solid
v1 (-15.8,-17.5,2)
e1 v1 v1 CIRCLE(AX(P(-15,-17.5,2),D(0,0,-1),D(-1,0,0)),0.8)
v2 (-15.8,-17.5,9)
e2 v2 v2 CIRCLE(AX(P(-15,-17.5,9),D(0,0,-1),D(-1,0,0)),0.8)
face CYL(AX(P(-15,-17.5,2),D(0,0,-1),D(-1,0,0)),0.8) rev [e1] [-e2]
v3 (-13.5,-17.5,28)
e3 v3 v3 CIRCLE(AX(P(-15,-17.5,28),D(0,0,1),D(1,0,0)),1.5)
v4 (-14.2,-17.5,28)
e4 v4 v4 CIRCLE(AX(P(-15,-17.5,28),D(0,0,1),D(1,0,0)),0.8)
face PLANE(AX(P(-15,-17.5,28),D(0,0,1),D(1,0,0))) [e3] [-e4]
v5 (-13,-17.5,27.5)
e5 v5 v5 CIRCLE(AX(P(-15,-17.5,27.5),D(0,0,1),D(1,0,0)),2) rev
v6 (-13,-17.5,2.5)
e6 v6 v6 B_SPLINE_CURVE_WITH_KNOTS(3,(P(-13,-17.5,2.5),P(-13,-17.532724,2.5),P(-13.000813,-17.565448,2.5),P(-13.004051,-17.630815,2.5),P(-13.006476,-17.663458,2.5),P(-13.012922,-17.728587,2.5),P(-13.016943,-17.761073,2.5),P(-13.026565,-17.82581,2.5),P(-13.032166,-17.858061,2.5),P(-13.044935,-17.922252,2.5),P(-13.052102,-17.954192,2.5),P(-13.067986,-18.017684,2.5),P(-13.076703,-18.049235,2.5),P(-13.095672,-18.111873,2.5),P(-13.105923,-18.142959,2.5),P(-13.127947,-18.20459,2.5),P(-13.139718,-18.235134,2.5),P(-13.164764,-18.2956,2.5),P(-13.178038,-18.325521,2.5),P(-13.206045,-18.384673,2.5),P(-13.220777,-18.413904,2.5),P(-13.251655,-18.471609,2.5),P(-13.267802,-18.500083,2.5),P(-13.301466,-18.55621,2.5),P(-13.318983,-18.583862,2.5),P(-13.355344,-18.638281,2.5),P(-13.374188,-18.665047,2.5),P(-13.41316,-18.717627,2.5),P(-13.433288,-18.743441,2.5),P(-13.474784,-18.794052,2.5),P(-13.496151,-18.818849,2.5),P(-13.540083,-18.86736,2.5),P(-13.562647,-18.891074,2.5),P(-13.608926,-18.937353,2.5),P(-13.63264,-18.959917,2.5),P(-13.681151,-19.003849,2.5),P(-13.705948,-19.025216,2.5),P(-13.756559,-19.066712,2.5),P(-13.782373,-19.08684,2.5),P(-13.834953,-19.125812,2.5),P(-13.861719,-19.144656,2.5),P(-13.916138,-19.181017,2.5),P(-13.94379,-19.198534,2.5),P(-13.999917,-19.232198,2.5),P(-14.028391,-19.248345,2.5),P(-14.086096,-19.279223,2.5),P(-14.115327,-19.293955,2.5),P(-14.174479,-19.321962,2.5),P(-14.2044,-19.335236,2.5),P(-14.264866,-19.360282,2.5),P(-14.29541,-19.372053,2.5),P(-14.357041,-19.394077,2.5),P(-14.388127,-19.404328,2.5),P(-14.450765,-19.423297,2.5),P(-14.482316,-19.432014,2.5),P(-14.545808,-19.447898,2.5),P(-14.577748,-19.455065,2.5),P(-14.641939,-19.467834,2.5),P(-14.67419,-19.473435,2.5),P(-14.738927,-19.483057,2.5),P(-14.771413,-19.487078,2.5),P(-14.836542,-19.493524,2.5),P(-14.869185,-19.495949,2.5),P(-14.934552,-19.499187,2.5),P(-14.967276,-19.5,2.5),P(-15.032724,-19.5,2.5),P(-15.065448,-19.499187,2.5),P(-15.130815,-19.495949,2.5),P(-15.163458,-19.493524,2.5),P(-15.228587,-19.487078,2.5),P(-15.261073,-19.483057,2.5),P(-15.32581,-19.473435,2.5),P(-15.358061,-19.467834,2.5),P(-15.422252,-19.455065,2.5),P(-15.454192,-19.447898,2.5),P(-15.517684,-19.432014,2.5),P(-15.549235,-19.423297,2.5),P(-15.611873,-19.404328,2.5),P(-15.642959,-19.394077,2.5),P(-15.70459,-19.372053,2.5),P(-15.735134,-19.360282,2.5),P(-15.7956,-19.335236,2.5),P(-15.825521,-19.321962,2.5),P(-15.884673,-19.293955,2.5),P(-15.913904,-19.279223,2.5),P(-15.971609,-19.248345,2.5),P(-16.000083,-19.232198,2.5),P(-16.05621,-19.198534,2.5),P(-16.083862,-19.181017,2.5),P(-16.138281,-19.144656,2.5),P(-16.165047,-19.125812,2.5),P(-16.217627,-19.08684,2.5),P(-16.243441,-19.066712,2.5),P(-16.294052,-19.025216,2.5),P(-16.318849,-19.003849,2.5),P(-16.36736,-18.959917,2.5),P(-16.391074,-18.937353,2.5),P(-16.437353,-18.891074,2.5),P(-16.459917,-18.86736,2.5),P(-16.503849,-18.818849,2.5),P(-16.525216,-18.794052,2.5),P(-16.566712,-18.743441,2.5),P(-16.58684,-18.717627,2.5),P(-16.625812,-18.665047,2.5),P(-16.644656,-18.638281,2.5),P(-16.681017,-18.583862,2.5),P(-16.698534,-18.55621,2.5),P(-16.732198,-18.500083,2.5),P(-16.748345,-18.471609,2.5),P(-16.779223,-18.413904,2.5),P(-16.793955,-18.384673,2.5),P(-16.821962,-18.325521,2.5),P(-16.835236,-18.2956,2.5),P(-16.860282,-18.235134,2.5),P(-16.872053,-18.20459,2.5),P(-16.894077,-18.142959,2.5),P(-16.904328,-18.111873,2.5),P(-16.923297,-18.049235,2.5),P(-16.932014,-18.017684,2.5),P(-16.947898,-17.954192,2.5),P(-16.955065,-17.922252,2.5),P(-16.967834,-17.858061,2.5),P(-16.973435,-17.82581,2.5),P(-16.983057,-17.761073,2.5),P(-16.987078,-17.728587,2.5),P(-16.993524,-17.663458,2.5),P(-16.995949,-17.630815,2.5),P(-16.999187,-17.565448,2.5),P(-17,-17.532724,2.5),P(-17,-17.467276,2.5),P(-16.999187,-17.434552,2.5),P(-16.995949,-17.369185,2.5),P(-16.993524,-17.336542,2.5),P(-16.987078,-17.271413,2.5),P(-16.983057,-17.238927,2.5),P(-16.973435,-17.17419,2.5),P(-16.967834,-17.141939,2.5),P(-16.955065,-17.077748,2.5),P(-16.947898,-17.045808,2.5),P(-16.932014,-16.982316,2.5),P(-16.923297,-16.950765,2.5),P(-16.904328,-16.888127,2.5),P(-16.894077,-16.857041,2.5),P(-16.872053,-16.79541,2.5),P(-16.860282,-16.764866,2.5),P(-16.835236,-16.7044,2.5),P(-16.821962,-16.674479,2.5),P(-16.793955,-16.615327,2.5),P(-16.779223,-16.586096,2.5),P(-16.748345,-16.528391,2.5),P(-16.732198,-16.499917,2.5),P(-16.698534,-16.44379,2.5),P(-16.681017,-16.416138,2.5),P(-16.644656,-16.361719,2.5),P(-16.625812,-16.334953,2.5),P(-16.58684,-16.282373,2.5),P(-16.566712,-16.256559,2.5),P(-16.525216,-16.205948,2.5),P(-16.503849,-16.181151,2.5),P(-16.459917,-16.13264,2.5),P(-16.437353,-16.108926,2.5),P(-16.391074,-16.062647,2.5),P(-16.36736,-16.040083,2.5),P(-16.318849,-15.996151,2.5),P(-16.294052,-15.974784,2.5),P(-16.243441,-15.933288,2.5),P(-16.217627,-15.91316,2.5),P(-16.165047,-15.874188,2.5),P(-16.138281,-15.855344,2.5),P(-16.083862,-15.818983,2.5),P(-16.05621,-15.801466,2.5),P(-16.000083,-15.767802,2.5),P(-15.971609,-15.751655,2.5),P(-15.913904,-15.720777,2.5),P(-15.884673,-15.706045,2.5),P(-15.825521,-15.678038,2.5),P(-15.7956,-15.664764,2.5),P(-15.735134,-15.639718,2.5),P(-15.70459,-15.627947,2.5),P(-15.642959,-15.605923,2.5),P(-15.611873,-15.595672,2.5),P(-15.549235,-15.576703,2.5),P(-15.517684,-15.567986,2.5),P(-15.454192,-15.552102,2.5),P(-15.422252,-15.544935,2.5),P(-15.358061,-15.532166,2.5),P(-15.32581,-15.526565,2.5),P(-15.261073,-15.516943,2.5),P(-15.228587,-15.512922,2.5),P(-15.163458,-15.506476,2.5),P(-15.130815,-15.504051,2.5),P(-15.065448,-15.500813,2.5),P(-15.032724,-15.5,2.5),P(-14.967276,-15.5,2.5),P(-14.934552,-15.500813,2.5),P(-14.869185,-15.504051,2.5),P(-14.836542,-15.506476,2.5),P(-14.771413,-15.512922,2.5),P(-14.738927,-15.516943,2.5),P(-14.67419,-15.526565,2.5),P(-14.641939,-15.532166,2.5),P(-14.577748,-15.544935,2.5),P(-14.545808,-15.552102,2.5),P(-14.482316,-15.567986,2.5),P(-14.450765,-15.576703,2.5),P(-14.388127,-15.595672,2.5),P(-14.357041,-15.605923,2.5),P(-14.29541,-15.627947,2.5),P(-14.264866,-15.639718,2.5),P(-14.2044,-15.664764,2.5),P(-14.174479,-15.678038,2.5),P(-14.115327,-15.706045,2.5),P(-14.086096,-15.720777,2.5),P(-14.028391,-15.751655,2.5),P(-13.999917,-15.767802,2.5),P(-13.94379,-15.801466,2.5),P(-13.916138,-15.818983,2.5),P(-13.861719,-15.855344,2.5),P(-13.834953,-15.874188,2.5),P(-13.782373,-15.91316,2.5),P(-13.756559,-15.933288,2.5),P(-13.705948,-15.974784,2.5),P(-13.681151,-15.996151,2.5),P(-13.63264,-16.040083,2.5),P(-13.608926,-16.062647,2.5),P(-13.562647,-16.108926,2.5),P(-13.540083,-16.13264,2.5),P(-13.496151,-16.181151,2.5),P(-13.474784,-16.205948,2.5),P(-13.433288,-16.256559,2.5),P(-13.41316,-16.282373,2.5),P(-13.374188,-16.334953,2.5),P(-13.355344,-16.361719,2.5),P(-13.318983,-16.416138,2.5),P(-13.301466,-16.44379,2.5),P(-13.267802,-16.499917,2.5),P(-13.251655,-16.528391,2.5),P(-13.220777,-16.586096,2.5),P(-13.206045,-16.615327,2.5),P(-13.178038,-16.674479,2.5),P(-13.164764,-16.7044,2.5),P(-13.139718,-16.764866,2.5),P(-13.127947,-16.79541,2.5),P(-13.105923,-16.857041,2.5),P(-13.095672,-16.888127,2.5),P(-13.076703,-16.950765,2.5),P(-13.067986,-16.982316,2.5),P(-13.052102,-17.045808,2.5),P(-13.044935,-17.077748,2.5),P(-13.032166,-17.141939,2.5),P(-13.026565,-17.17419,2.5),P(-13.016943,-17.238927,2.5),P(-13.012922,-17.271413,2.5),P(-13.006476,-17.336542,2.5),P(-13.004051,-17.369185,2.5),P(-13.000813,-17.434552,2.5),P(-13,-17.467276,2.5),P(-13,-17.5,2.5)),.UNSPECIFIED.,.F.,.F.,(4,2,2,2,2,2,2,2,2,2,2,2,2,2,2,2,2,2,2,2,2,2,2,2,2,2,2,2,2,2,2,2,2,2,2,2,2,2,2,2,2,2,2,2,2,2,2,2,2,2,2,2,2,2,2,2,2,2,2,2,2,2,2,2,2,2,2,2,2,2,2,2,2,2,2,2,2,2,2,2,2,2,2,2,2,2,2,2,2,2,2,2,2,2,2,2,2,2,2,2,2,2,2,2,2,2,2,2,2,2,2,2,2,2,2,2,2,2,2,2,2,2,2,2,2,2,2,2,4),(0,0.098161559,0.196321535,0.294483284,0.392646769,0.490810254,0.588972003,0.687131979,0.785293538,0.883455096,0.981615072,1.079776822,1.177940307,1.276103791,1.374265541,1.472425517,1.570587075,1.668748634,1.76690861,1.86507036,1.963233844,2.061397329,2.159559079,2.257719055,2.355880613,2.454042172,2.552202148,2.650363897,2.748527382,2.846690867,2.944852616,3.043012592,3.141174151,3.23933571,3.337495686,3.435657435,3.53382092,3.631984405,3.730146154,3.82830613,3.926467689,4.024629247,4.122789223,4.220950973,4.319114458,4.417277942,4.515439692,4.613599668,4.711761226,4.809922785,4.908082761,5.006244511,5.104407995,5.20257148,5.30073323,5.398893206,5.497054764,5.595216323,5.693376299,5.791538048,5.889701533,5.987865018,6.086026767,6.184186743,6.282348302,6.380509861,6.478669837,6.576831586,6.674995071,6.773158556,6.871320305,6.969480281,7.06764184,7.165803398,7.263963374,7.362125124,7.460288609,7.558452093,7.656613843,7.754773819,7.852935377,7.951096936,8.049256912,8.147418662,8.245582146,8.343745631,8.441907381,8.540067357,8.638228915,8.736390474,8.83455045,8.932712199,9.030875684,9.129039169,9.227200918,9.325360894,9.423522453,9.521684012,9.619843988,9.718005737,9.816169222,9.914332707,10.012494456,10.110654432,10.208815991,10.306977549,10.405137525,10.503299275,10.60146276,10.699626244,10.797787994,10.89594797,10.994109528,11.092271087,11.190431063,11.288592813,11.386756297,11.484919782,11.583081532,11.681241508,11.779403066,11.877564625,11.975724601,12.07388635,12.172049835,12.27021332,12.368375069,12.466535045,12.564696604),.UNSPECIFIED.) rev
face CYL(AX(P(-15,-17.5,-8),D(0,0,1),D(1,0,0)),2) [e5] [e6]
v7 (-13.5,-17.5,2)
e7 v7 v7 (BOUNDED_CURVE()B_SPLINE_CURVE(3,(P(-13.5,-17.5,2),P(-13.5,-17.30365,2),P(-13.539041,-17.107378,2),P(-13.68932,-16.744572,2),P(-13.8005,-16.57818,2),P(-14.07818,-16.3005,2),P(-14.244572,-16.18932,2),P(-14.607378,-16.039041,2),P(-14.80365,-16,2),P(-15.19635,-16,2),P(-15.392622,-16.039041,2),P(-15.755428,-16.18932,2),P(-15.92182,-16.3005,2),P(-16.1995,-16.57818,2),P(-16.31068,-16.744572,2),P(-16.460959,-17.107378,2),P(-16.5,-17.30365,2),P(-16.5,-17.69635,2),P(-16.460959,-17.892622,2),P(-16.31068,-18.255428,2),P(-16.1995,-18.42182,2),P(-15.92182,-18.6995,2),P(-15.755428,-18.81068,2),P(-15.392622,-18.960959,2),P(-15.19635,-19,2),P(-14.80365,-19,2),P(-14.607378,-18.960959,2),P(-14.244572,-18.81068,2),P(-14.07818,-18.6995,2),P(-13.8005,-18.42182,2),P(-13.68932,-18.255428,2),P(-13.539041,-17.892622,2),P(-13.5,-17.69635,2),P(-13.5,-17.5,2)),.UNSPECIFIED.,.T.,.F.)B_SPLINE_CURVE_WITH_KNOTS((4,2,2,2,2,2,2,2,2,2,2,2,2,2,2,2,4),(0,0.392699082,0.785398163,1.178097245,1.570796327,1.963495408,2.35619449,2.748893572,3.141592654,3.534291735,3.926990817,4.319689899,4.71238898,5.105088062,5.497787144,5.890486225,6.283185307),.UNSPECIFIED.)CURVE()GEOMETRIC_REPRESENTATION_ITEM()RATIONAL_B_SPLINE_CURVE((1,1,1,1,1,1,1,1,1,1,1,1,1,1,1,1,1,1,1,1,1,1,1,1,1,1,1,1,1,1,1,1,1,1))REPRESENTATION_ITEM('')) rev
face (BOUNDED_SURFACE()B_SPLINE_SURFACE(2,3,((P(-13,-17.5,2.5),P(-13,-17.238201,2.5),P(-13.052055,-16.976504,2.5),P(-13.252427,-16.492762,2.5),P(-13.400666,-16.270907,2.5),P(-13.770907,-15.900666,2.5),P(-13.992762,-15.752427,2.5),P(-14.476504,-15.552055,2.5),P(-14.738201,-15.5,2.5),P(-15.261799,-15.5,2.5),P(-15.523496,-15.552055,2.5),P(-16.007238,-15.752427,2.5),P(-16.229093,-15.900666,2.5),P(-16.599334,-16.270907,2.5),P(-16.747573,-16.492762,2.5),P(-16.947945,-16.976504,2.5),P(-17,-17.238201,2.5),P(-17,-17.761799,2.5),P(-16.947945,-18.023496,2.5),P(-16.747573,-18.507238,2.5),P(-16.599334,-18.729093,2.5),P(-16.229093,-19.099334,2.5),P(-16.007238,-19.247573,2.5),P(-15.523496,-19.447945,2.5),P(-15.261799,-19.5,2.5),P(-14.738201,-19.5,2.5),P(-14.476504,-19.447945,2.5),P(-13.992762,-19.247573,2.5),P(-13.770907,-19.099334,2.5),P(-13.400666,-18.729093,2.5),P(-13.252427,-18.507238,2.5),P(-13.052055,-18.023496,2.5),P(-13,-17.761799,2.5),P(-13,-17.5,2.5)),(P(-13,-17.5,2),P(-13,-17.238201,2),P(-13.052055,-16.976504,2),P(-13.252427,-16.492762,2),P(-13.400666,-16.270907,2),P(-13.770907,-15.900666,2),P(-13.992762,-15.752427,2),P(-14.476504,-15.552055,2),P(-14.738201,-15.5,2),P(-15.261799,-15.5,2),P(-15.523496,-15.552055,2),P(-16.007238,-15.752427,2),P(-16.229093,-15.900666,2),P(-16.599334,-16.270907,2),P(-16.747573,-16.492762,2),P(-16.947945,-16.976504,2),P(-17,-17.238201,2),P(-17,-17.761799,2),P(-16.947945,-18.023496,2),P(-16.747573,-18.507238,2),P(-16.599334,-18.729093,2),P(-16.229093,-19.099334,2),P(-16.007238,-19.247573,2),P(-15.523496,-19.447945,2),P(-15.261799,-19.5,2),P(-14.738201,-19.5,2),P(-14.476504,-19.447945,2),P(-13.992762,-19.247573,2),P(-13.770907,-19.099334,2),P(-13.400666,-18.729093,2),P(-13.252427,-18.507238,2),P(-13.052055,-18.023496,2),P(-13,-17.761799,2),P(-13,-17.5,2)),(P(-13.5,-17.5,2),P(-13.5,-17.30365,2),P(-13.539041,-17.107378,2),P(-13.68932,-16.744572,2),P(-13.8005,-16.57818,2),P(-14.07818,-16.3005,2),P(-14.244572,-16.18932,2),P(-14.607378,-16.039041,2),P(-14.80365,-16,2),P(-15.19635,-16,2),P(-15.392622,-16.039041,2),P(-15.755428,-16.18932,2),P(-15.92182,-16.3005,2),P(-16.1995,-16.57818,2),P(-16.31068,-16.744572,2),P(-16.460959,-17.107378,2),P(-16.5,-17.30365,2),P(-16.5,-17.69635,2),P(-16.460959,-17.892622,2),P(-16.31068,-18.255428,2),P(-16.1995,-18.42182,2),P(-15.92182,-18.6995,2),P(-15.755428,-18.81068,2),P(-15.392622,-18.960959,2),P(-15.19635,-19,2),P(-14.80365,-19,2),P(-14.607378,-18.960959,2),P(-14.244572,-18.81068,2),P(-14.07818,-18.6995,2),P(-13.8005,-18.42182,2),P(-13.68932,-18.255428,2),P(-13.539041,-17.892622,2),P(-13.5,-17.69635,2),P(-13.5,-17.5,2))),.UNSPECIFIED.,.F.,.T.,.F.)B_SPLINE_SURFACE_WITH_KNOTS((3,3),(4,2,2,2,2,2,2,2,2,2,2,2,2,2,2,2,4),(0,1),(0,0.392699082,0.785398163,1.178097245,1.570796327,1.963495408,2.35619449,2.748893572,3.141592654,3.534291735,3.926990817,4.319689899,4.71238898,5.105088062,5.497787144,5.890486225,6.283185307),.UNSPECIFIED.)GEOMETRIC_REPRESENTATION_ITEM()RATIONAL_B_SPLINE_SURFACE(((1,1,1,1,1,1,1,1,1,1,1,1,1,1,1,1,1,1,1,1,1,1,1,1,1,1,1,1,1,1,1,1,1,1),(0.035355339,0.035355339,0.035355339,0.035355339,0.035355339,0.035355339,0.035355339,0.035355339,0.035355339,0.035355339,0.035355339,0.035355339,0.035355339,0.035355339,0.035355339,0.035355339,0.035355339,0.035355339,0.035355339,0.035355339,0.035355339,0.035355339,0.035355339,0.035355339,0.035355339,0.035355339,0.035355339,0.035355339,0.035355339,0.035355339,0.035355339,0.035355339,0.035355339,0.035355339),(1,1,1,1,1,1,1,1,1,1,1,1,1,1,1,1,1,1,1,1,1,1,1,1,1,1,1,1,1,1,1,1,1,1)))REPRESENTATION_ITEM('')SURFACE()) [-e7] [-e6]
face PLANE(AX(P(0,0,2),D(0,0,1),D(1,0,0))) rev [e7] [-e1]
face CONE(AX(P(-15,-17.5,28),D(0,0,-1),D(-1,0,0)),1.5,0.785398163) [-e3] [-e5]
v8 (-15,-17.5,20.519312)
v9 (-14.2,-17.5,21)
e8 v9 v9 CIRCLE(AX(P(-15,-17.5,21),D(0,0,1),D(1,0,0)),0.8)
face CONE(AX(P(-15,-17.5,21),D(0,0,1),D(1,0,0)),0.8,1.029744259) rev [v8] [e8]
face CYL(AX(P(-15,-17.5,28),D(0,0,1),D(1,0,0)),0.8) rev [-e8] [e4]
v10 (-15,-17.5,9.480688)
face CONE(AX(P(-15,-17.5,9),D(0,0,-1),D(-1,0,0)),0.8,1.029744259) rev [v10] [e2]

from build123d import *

# Parameters (mm, degrees)
SKETCH_2_W             = 38
SKETCH_2_H             = 39
EXTRUDE_1_DEPTH        = 2
CHAMFER_3_SIZE         = 1
SKETCH_7_R             = 4.25
CUT_EXTRUDE_3_DEPTH    = 10
SKETCH_8_W             = 2
SKETCH_8_H             = 39
CUT_EXTRUDE_4_DEPTH    = 10
FILLET_3_R             = 2
SKETCH_9_R             = 2
EXTRUDE_1_2_DEPTH      = 26
SKETCH_10_W            = 3
SKETCH_10_H            = 39
CUT_EXTRUDE_1_DEPTH    = 10
FILLET_5_R             = 2
CHAMFER_5_SIZE         = 0.5
HOLE_WIZARD_M2_5_3_D   = 2.05
HOLE_WIZARD_M2_1_D     = 1.6
HOLE_WIZARD_M2_1_DEPTH = 7
HOLE_WIZARD_M2_1_TIP   = 0.480688495
CUT_EXTRUDE_2_DEPTH    = 10
SKETCH_24_W            = 71.290640242
SKETCH_24_H            = 51.144653494
CUT_EXTRUDE_3_2_DEPTH  = 10
SKETCH_25_R            = 6.539265834
CUT_EXTRUDE_4_2_DEPTH  = 32
HOLE_WIZARD_M2_2_D     = 1.6
HOLE_WIZARD_M2_2_DEPTH = 7
HOLE_WIZARD_M2_2_TIP   = 0.480688495
FILLET_6_SIZE          = 0.5


with BuildPart() as part:
    # 草图2 → Extrude 1 (new body)
    with BuildSketch(Plane.XY):
        Rectangle(SKETCH_2_W, SKETCH_2_H)
    extrude(amount=EXTRUDE_1_DEPTH)

    # 倒角3
    chamfer_3_edges = [part.edges().sort_by_distance(p)[0] for p in [
        (-19, 19.5, 1),
        (-19, -19.5, 1),
    ]]
    chamfer(chamfer_3_edges, length=CHAMFER_3_SIZE)

    # 草图7 → Cut-Extrude 3 (cut)
    with BuildSketch(Plane.XY.offset(2)):
        with Locations((2, 0)):
            Circle(SKETCH_7_R)
    extrude(amount=-CUT_EXTRUDE_3_DEPTH, mode=Mode.SUBTRACT)

    # 草图8 → Cut-Extrude 4 (cut)
    with BuildSketch(Plane.XY.offset(2)):
        with Locations((-18, 0)):
            Rectangle(SKETCH_8_W, SKETCH_8_H)
    extrude(amount=-CUT_EXTRUDE_4_DEPTH, mode=Mode.SUBTRACT)

    # 圆角3
    fillet_3_edges = [part.edges().sort_by_distance(p)[0] for p in [
        (-17, 19.5, 1),
        (-17, -19.5, 1),
    ]]
    fillet(fillet_3_edges, radius=FILLET_3_R)

    # 草图9 → Extrude 1 2 (add)
    with BuildSketch(Plane.XY.offset(2)):
        with Locations((-15, 17.5)):
            Circle(SKETCH_9_R)
        with Locations((-15, -17.5)):
            Circle(SKETCH_9_R)
    extrude_1_2 = extrude(amount=EXTRUDE_1_2_DEPTH)

    # 镜向1: Extrude 1 2 across plane
    add(extrude_1_2.mirror(Plane.ZX))

    # 草图10 → 切除-拉伸1 (cut)
    with BuildSketch(Plane(origin=(0, 0, 0), x_dir=(-1, 0, 0), z_dir=(0, 0, -1))):
        with Locations((-17.5, 0)):
            Rectangle(SKETCH_10_W, SKETCH_10_H)
    extrude(amount=-CUT_EXTRUDE_1_DEPTH, mode=Mode.SUBTRACT)

    # 圆角5
    fillet_5_edges = [part.edges().sort_by_distance(p)[0] for p in [
        (16, -19.5, 1),
        (16, 19.5, 1),
    ]]
    fillet(fillet_5_edges, radius=FILLET_5_R)

    # 倒角5
    chamfer_5_edges = [part.edges().sort_by_distance(p)[0] for p in [
        (-17, -17.5, 28),
        (-17, 17.5, 28),
        (15.414213562, 18.914213562, 0),
        (16, 0, 0),
        (-0.5, 19.5, 0),
        (15.414213562, -18.914213562, 0),
        (-16.414213562, 18.914213562, 0),
        (-0.5, -19.5, 0),
        (-17, 0, 0),
        (-16.414213562, -18.914213562, 0),
    ]]
    chamfer(chamfer_5_edges, length=CHAMFER_5_SIZE)

    # M2.5 螺纹孔3 (through all)
    with Locations(Plane(origin=(9.5, 15.5, 0), x_dir=(-1, 0, 0), z_dir=(0, 0, -1))):
        with Locations((0, 0), (15, 0), (0, -31), (15, -31)):
            Hole(HOLE_WIZARD_M2_5_3_D / 2)

    # M2 螺纹孔1
    with Locations(Plane(origin=(-15, 17.5, 28), x_dir=(1, 0, 0), z_dir=(0, 0, 1))):
        with Locations((0, 0), (0, -35)):
            Hole(HOLE_WIZARD_M2_1_D / 2, depth=HOLE_WIZARD_M2_1_DEPTH)
            with Locations((0, 0, -(HOLE_WIZARD_M2_1_DEPTH + HOLE_WIZARD_M2_1_TIP / 2))):  # 118° drill point
                Cone(0, HOLE_WIZARD_M2_1_D / 2, HOLE_WIZARD_M2_1_TIP, mode=Mode.SUBTRACT)

    # 草图23 → 切除-拉伸2 (cut)
    with BuildSketch(Plane(origin=(0, 0, 0), x_dir=(-1, 0, 0), z_dir=(0, 0, -1))):
        with BuildLine():
            Line((-0.95, 16.2), (-0.95, 9.8))
            ThreePointArc((-0.95, 9.8), (-2, 8.75), (-3.05, 9.8))
            Line((-3.05, 9.8), (-3.05, 16.2))
            ThreePointArc((-3.05, 16.2), (-2, 17.25), (-0.95, 16.2))
        make_face()
    cut_extrude_2 = extrude(amount=-CUT_EXTRUDE_2_DEPTH, mode=Mode.SUBTRACT)

    # 镜向2: 切除-拉伸2 across plane
    add(cut_extrude_2.mirror(Plane.ZX), mode=Mode.SUBTRACT)

    # 草图24 → Cut-Extrude 3 2 (cut)
    with BuildSketch(Plane.XY.offset(2)):
        Rectangle(SKETCH_24_W, SKETCH_24_H)
    extrude(amount=-CUT_EXTRUDE_3_2_DEPTH, mode=Mode.SUBTRACT)


with BuildPart() as cut_extrude_3_2_piece_1:
    # of the separate pieces the step leaves, piece 1, a body of its own (cut_extrude_3_2_pieces)
    add(part.part.solids().sort_by_distance((-13, 17.5, 27.5))[0])

    # 草图25 → Cut-Extrude 4 2 (cut)
    with BuildSketch(Plane(origin=(0, 0, 2), x_dir=(-1, 0, 0), z_dir=(0, 0, -1))):
        with Locations((15, 17.5)):
            Circle(SKETCH_25_R)
    extrude(amount=-CUT_EXTRUDE_4_2_DEPTH, mode=Mode.SUBTRACT)


with BuildPart() as cut_extrude_3_2_piece_2:
    # of the separate pieces the step leaves, piece 2, a body of its own (cut_extrude_3_2_pieces)
    add(part.part.solids().sort_by_distance((-13, -17.5, 2))[0])

    # M2 螺纹孔2
    with Locations(Plane(origin=(-15, -17.5, 2), x_dir=(-1, 0, 0), z_dir=(0, 0, -1))):
        with Locations((0, 0)):
            Hole(HOLE_WIZARD_M2_2_D / 2, depth=HOLE_WIZARD_M2_2_DEPTH)
            with Locations((0, 0, -(HOLE_WIZARD_M2_2_DEPTH + HOLE_WIZARD_M2_2_TIP / 2))):  # 118° drill point
                Cone(0, HOLE_WIZARD_M2_2_D / 2, HOLE_WIZARD_M2_2_TIP, mode=Mode.SUBTRACT)

    # 圆角6
    # a fillet whose section is not a circle: 0.5 mm, written as the material it takes off along each edge
    with BuildSketch(Plane(origin=(-15, -17.5, 2), x_dir=(1, 0, 0), z_dir=(0, -1, 0))) as fillet_6_piece_1:
        with BuildLine():
            Bezier((2, FILLET_6_SIZE), (2, 0), (2 - FILLET_6_SIZE, 0), weights=[1, 0.035355339, 1])
            Line((2 - FILLET_6_SIZE, 0), (2, 0))
            Line((2, 0), (2, FILLET_6_SIZE))
        make_face()
    revolve(axis=Axis((-15, -17.5, 2), (0, 0, 1)), mode=Mode.SUBTRACT)


solid = cut_extrude_3_2_piece_2.part
